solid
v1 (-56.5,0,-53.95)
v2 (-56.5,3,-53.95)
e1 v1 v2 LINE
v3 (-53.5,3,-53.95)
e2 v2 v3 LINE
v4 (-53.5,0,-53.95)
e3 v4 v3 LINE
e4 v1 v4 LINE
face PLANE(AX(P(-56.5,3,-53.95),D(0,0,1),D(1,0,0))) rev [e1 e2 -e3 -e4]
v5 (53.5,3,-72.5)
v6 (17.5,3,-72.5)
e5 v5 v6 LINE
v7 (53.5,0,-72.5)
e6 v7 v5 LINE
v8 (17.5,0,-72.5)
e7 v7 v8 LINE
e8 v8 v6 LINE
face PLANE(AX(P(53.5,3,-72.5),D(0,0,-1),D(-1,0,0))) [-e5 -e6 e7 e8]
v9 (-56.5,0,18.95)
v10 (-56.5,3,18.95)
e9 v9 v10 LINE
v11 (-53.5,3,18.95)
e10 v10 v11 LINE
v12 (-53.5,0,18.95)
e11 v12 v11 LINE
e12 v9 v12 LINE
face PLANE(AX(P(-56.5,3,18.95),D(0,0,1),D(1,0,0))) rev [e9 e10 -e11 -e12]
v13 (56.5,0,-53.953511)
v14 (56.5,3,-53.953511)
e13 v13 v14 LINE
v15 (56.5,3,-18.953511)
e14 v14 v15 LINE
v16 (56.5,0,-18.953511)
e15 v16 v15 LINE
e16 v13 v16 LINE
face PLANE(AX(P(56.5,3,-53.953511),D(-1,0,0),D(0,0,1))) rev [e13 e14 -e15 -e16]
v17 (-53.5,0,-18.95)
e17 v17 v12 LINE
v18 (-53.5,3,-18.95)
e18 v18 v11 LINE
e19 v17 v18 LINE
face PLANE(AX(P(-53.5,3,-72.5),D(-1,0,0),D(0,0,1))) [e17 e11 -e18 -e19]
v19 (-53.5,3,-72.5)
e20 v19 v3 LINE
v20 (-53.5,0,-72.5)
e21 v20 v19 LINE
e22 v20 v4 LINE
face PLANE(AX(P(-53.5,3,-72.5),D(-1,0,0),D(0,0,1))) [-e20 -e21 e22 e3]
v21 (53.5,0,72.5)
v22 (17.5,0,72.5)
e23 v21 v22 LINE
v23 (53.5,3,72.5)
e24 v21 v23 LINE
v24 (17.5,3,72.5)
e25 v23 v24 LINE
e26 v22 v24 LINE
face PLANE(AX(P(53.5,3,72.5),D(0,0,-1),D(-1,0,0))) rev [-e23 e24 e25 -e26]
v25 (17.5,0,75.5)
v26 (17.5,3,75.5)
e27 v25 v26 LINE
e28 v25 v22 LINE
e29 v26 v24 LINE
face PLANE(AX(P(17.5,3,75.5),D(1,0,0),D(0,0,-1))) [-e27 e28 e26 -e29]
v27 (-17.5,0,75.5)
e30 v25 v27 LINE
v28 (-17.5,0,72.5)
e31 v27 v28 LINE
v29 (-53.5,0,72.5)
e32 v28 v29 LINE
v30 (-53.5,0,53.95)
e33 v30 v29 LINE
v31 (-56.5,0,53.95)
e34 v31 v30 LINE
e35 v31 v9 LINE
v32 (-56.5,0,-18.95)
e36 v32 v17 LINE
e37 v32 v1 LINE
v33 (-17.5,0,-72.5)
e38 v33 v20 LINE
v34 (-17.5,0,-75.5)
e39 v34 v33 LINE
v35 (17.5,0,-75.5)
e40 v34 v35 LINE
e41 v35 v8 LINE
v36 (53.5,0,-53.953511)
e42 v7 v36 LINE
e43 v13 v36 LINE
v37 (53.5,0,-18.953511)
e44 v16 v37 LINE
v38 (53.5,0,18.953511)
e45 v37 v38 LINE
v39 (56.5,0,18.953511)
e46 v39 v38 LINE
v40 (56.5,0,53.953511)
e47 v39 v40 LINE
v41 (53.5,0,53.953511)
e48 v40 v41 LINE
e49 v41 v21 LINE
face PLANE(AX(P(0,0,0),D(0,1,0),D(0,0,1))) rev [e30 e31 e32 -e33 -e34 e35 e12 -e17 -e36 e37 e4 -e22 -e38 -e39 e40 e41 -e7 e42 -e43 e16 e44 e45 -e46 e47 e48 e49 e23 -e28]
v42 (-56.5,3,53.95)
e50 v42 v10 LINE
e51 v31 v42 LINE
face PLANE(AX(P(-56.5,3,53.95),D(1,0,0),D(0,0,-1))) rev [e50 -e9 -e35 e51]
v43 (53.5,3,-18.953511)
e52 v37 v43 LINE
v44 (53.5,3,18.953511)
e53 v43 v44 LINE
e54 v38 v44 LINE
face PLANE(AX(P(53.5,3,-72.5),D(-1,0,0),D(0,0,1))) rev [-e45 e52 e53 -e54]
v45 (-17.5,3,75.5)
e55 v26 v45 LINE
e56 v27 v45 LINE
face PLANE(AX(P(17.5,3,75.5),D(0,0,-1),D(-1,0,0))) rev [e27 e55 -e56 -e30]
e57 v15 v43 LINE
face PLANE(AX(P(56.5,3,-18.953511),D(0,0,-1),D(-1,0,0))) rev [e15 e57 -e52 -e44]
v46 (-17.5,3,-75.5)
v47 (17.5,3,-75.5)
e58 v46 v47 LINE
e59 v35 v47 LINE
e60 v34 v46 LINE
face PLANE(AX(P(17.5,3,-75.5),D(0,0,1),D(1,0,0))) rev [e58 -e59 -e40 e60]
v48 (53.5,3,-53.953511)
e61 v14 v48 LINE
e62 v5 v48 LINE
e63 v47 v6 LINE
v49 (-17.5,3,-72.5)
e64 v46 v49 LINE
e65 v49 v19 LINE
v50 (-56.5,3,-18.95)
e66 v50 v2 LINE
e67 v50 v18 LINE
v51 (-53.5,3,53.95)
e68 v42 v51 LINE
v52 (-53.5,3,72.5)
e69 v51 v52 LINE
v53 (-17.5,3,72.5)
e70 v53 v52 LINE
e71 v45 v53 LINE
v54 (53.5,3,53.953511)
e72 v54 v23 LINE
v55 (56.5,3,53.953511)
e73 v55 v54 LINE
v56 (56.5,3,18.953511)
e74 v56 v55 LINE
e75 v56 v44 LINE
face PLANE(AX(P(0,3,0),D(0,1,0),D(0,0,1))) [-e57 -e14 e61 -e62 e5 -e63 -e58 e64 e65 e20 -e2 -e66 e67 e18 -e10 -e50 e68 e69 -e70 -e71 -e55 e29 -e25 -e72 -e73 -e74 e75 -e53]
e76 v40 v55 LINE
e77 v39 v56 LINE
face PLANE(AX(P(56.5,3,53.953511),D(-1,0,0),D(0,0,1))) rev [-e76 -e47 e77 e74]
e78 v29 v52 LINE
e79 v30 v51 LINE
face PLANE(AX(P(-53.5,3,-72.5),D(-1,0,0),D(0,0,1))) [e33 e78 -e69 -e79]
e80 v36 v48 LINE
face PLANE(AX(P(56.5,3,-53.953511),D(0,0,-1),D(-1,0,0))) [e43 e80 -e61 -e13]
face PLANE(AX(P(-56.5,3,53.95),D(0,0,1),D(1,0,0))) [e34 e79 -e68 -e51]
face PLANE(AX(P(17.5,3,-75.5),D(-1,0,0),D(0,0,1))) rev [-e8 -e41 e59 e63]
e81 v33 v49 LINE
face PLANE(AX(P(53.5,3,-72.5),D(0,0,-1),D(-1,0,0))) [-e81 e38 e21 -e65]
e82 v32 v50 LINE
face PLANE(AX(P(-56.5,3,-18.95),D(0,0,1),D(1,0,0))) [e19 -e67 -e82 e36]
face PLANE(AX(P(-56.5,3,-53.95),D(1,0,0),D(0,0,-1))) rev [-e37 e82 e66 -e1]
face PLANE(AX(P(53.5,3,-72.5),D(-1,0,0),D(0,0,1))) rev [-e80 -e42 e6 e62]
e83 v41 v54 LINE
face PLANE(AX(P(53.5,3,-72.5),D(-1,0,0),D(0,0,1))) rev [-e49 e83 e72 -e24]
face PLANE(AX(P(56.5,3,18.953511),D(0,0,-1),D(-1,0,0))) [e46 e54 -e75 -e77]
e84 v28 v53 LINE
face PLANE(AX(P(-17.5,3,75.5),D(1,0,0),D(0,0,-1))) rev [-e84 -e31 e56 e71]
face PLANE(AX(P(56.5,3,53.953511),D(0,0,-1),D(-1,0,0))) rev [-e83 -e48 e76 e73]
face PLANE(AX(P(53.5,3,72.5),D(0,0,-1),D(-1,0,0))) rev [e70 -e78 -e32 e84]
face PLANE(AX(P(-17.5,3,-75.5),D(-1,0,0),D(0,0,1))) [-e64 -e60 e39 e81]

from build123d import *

# Parameters (mm, degrees)
SKETCH1_W           = 107
SKETCH1_H           = 145
BOSS_EXTRUDE1_DEPTH = 3
SKETCH3_W           = 35
SKETCH3_H           = 3
BOSS_EXTRUDE4_DEPTH = 3
SKETCH4_W           = 35
SKETCH4_H           = 3
BOSS_EXTRUDE5_DEPTH = 3
SKETCH5_W           = 35
SKETCH5_H           = 3
BOSS_EXTRUDE6_DEPTH = 3
SKETCH6_W           = 35
SKETCH6_H           = 3
BOSS_EXTRUDE7_DEPTH = 3


with BuildPart() as part:
    # Sketch1 → Boss-Extrude1 (new body)
    with BuildSketch(Plane(origin=(0, 0, 0), x_dir=(1, 0, 0), z_dir=(0, 1, 0))):
        Rectangle(SKETCH1_W, SKETCH1_H)
    extrude(amount=BOSS_EXTRUDE1_DEPTH)

    # Sketch3 → Boss-Extrude4 (add)
    with BuildSketch(Plane(origin=(53.5, 0, 0), x_dir=(0, 0, -1), z_dir=(1, 0, 0))):
        with Locations((36.453510912, 1.5)):
            Rectangle(SKETCH3_W, SKETCH3_H)
        with Locations((-36.453510912, 1.5)):
            Rectangle(SKETCH3_W, SKETCH3_H)
    extrude(amount=BOSS_EXTRUDE4_DEPTH)

    # Sketch4 → Boss-Extrude5 (add)
    with BuildSketch(Plane.ZY.offset(53.5)):
        with Locations((-36.45, 1.5)):
            Rectangle(SKETCH4_W, SKETCH4_H)
        with Locations((36.45, 1.5)):
            Rectangle(SKETCH4_W, SKETCH4_H)
    extrude(amount=BOSS_EXTRUDE5_DEPTH)

    # Sketch5 → Boss-Extrude6 (add)
    with BuildSketch(Plane.XY.offset(72.5)):
        with Locations((0, 1.5)):
            Rectangle(SKETCH5_W, SKETCH5_H)
    extrude(amount=BOSS_EXTRUDE6_DEPTH)

    # Sketch6 → Boss-Extrude7 (add)
    with BuildSketch(Plane(origin=(0, 0, -72.5), x_dir=(-1, 0, 0), z_dir=(0, 0, -1))):
        with Locations((0, 1.5)):
            Rectangle(SKETCH6_W, SKETCH6_H)
    extrude(amount=BOSS_EXTRUDE7_DEPTH)


solid = part.part
